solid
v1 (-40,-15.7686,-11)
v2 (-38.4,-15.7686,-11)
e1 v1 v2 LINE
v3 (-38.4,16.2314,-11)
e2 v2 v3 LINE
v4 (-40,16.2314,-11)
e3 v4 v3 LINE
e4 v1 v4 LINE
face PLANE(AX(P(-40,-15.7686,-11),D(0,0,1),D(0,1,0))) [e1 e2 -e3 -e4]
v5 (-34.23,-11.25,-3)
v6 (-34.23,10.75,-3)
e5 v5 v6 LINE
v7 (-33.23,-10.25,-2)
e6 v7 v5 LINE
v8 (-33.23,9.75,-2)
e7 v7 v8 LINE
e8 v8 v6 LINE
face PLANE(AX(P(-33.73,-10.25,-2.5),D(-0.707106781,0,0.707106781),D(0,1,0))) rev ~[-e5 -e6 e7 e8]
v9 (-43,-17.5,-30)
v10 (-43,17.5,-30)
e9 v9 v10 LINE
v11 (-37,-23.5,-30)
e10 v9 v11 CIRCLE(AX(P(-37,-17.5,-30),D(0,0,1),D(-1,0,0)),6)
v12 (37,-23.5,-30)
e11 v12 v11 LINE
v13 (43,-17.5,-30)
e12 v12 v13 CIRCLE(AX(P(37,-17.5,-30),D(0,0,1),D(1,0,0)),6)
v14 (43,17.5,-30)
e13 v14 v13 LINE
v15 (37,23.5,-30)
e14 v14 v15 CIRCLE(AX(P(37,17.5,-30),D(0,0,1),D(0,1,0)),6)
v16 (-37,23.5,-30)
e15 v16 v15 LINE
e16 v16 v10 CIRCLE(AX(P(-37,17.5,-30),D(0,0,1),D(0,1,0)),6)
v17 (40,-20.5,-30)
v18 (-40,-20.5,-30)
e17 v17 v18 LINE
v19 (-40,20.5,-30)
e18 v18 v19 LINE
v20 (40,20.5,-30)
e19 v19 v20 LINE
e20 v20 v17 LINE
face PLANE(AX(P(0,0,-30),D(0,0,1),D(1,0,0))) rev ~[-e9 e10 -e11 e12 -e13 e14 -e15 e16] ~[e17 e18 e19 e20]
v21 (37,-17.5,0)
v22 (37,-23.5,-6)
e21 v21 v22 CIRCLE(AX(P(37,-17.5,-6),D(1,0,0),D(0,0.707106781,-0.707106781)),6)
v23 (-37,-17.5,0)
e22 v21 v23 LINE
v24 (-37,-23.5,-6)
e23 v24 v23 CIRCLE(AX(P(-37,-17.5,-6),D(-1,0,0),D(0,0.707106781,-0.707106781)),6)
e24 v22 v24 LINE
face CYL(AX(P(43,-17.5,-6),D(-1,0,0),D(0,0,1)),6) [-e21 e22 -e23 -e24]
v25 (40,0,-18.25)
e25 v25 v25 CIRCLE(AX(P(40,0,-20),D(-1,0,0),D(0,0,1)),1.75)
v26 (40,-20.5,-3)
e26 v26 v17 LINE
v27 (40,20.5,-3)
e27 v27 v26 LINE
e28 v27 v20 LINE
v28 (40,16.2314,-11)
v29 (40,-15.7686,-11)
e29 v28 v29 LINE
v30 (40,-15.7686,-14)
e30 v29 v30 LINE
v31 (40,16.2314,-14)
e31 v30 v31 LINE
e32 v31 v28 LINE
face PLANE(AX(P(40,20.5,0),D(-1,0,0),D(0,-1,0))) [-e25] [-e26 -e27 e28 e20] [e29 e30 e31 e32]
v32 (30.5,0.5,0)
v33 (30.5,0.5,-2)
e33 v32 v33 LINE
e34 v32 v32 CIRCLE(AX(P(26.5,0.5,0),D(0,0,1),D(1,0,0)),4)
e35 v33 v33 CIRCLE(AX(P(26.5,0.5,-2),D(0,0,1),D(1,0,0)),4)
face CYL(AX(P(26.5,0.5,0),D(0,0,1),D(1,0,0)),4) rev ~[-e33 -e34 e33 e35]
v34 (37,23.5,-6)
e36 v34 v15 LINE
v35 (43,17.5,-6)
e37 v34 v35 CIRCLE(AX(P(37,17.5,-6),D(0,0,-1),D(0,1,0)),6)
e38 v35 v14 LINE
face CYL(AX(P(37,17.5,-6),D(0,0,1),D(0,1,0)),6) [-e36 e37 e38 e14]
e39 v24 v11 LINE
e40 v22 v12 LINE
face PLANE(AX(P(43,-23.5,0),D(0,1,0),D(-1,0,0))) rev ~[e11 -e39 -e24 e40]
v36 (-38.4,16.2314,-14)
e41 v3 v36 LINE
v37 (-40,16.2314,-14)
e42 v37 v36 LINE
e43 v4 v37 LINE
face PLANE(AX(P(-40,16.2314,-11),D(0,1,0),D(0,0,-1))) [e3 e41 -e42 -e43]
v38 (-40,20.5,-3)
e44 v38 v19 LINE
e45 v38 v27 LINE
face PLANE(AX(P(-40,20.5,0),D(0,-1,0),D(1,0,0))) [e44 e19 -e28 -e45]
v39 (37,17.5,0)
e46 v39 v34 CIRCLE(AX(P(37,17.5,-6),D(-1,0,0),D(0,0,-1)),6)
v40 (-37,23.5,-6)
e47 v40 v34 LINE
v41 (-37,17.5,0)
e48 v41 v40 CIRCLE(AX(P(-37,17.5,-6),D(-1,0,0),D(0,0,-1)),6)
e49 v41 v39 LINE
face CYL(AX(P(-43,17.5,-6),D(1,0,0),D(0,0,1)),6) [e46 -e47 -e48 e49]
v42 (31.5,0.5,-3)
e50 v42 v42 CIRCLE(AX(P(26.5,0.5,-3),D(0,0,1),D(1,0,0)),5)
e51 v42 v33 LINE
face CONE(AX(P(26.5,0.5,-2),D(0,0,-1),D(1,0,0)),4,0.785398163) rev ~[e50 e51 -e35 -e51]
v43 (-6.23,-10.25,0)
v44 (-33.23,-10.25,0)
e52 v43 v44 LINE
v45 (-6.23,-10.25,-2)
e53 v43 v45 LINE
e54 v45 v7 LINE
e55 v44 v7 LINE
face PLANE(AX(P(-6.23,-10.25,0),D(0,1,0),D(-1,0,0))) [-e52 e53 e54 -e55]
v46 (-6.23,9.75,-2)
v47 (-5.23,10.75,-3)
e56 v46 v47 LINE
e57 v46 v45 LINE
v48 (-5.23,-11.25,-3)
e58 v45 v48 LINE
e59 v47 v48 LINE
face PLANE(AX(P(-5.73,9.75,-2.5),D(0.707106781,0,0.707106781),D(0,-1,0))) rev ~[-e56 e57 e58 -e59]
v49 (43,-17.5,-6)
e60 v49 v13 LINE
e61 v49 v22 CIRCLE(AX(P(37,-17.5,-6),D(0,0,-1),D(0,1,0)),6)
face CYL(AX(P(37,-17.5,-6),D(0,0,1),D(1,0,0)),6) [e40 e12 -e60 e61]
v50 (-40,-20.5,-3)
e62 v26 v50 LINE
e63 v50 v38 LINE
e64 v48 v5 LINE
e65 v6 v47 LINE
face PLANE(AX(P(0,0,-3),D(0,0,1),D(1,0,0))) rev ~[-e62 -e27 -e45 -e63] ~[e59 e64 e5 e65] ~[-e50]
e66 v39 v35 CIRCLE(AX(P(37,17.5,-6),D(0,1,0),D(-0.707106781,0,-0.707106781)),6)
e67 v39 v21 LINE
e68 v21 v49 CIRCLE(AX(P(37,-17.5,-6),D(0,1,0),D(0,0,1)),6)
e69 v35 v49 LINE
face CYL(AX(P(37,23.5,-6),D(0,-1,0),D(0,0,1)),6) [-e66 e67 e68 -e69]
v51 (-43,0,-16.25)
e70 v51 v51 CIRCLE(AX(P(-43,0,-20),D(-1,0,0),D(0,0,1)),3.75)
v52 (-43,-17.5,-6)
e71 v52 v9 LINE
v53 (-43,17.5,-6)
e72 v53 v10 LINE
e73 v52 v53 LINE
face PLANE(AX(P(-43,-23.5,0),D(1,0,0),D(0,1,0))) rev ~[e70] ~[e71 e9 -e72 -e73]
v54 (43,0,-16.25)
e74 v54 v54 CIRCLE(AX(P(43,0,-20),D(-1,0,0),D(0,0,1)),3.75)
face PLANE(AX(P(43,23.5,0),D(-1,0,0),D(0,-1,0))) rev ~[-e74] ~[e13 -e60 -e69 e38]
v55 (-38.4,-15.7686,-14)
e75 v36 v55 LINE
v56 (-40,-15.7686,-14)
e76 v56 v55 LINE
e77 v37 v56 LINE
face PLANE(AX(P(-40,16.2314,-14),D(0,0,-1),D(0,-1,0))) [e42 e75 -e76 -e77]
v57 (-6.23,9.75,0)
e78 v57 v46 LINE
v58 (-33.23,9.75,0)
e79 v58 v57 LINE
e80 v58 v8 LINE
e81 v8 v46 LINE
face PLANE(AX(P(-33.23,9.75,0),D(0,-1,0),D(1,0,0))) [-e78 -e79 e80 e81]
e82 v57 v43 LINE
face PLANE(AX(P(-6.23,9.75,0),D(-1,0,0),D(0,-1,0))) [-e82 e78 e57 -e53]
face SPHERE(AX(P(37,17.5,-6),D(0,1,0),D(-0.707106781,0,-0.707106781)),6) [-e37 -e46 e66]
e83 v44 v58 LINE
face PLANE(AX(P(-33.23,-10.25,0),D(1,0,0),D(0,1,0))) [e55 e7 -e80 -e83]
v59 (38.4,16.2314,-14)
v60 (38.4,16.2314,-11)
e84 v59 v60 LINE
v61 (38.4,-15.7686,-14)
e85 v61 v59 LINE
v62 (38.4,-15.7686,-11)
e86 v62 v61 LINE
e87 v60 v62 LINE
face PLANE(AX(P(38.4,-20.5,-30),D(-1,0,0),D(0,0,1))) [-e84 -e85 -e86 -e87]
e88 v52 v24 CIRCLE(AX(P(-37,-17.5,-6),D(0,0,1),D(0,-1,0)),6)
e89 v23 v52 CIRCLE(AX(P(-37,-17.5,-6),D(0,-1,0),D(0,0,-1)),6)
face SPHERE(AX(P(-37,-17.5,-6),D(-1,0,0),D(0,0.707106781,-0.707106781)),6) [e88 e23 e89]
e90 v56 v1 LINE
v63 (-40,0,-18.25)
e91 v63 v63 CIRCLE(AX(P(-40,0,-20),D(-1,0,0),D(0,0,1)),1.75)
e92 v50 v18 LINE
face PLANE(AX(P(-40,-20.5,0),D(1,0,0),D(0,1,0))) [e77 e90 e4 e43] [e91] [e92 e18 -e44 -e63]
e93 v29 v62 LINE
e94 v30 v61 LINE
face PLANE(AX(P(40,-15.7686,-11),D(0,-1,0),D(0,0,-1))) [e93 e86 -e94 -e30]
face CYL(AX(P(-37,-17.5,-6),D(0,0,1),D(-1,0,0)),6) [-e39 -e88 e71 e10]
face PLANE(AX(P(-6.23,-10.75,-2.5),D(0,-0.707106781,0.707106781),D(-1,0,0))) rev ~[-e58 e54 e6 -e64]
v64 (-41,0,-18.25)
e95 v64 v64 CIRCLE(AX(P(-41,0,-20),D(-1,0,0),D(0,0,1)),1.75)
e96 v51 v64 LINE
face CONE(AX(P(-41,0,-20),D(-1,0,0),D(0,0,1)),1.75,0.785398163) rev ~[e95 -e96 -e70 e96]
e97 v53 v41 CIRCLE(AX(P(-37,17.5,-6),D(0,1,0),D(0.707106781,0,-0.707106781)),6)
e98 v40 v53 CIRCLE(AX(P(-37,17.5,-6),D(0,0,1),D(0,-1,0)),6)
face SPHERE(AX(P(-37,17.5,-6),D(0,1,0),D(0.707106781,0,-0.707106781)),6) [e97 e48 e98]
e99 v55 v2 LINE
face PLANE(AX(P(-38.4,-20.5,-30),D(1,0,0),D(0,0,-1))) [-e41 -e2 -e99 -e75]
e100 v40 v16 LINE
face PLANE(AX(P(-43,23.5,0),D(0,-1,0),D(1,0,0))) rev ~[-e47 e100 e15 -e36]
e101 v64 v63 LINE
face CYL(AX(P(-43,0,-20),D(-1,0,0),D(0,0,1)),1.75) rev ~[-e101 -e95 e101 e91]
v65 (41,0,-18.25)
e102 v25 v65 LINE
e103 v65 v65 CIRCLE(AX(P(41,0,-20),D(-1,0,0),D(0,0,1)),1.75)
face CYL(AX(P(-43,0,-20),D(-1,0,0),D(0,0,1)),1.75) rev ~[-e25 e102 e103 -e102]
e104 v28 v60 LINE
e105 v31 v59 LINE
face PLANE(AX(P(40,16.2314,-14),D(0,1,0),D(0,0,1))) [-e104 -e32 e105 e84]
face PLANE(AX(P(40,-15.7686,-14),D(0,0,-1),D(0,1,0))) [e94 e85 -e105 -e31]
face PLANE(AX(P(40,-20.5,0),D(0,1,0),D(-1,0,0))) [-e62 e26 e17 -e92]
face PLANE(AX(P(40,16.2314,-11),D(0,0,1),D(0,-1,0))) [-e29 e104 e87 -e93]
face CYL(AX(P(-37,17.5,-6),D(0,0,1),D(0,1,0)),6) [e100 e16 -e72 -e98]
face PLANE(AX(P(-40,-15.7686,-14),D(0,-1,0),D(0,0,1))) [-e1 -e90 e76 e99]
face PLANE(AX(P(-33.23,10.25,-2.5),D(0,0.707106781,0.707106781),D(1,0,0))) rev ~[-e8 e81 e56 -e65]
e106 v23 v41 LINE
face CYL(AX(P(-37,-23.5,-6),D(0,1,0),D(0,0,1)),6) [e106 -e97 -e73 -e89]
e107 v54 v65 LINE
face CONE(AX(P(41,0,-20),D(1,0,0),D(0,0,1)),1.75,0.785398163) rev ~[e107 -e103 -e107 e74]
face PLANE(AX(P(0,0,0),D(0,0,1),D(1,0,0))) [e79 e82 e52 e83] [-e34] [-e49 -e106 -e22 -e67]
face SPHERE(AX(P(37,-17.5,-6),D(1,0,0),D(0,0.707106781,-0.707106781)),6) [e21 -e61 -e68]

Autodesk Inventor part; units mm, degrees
ref_plane "YZ Plane" through (0, 0, 0) normal (1, 0, 0) x (0, 1, 0)
ref_plane "XZ Plane" through (0, 0, 0) normal (0, 1, 0) x (-1, 0, 0)
ref_plane "XY Plane" through (0, 0, 0) normal (0, 0, 1) x (1, 0, 0)
sketch "Sketch1" plane through (0, 0, 0) normal (0, 0, 1) x (1, 0, 0)
  line L0 (-40, 20.5) -> (40, 20.5)
  line L1 (40, 20.5) -> (40, -20.5)
  line L2 (40, -20.5) -> (-40, -20.5)
  line L3 (-40, -20.5) -> (-40, 20.5)
  line L4 (-40, 20.5) -> (40, -20.5) construction
  line L5 (40, 20.5) -> (-40, -20.5) construction
  line L6 (-43, 23.5) -> (43, 23.5)
  line L7 (43, 23.5) -> (43, -23.5)
  line L8 (43, -23.5) -> (-43, -23.5)
  line L9 (-43, -23.5) -> (-43, 23.5)
  line L10 (-43, 23.5) -> (43, -23.5) construction
  line L11 (43, 23.5) -> (-43, -23.5) construction
  point P0 (0, 0)
  dimension "d0" = 80
  dimension "d1" = 41
  dimension "d2" = 86
  dimension "d3" = 47
extrude "Extrusion1" add sketch "Sketch1" against normal blind 30
sketch "Sketch2" plane through (0, 0, 0) normal (0, 0, 1) x (1, 0, 0)
  line L0 (-40, -20.5) -> (-40, 20.5) projected
  line L1 (-40, 20.5) -> (40, 20.5) projected
  line L2 (40, 20.5) -> (40, -20.5) projected
  line L3 (40, -20.5) -> (-40, -20.5) projected
  point P0 (0, 0)
extrude "Extrusion2" add sketch "Sketch2" against normal blind 3
sketch "Sketch4" plane through (0, 0, 0) normal (0, 0, 1) x (1, 0, 0)
  line L0 (-43, 23.5) -> (43, 23.5) projected
  line L1 (-43, -23.5) -> (-43, 23.5) projected
  line L2 (43, -23.5) -> (-43, -23.5) projected
  line L3 (43, 23.5) -> (43, -23.5) projected
  line L4 (-39.5, 20) -> (39.5, 20)
  line L5 (39.5, 20) -> (39.5, -20)
  line L6 (39.5, -20) -> (-39.5, -20)
  line L7 (-39.5, -20) -> (-39.5, 20)
  line L8 (-39.5, 20) -> (39.5, -20) construction
  line L9 (39.5, 20) -> (-39.5, -20) construction
  point P0 (0, 0)
  dimension "d12" = 79
  dimension "d13" = 40
sketch "Sketch5" plane through (0, 0, 0) normal (0, 0, 1) x (1, 0, 0)
  line L0 (-33.23, 9.75) -> (-6.23, 9.75)
  line L1 (-6.23, 9.75) -> (-6.23, -10.25)
  line L2 (-6.23, -10.25) -> (-33.23, -10.25)
  line L3 (-33.23, -10.25) -> (-33.23, 9.75)
  line L4 (-33.23, 9.75) -> (-6.23, -10.25) construction
  line L5 (-6.23, 9.75) -> (-33.23, -10.25) construction
  line L6 (-39.5, 20) -> (39.5, 20) projected
  line L7 (-39.5, -20) -> (-39.5, 20) projected
  line L8 (39.5, -20) -> (-39.5, -20) projected
  point P0 (0, 0)
  point P1 (-19.73, -0.25)
  dimension "d14" = 27
  dimension "d15" = 20
  dimension "d16" = 10.25
  dimension "d17" = 6.27
extrude "Extrusion3" cut sketch "Sketch5" against normal blind 3
sketch "Sketch6" plane through (0, 0, 0) normal (0, 0, 1) x (1, 0, 0)
  circle A0 centre (26.5, 0.5) radius 4
  line L0 (39.5, -20) -> (-39.5, -20) projected
  line L1 (39.5, 20) -> (39.5, -20) projected
  line L2 (-39.5, 20) -> (39.5, 20) projected
  point P0 (0, 0)
  dimension "d20" = 8
  dimension "d21" = 20.5
  dimension "d22" = 13
extrude "Extrusion4" cut sketch "Sketch6" against normal blind 3
chamfer "Chamfer1" distance 1 angle 45 4 edges at (-6.23, -0.25, -3) (-19.73, 9.75, -3) (-19.73, -10.25, -3) (-33.23, -0.25, -3)
chamfer "Chamfer2" distance 1 angle 45 1 edges at (22.5, 0.5, -3)
fillet "Fillet1" radius 6 4 edges at (0, 23.5, 0) (43, 0, 0) (0, -23.5, 0) (-43, 0, 0)
fillet "Fillet2" radius 6 8 edges at (-41.2426, 21.7426, -1.7574) (-43, 23.5, -18) (41.2426, 21.7426, -1.7574) (43, 23.5, -18) (41.2426, -21.7426, -1.7574) (43, -23.5, -18) (-43, -23.5, -18) (-41.2426, -21.7426, -1.7574)
sketch "Sketch7" plane through (-43, -17.5, -6) normal (-1, 0, 0) x (0, 0, 1)
  line L0 (-24, 0) -> (-24, 35) projected
  circle A0 centre (-14, 17.5) radius 1.75
  point P0 (6, 17.5)
  dimension "d33" = 3.5
  dimension "d34" = 10
extrude "Extrusion5" cut sketch "Sketch7" against normal through all
chamfer "Chamfer3" distance 2 angle 45 2 edges at (-43, 0, -21.75) (43, 0, -21.75)
sketch "Sketch8" plane through (-40, -20.5, -30) normal (1, 0, 0) x (0, 0, -1)
  line L0 (-27, 41) -> (-27, 0) projected
  line L1 (-19, 36.7314) -> (-16, 36.7314)
  line L2 (-16, 36.7314) -> (-16, 4.7314)
  line L3 (-16, 4.7314) -> (-19, 4.7314)
  line L4 (-19, 4.7314) -> (-19, 36.7314)
  point P0 (-30, 20.5)
  dimension "d40" = 3
  dimension "d41" = 32
  dimension "d42" = 8
extrude "Extrusion6" add sketch "Sketch8" along normal blind 1.6
sketch "Sketch9" plane through (40, -20.5, -30) normal (-1, 0, 0) x (0, 0, 1)
  line L0 (16, 36.7314) -> (19, 36.7314) projected
  line L1 (19, 36.7314) -> (19, 4.7314) projected
  line L2 (19, 4.7314) -> (16, 4.7314) projected
  line L3 (16, 4.7314) -> (16, 36.7314) projected
  point P0 (30, 20.5)
extrude "Extrusion7" add sketch "Sketch9" along normal blind 1.6
properties part number "obudowa - timer- front"
